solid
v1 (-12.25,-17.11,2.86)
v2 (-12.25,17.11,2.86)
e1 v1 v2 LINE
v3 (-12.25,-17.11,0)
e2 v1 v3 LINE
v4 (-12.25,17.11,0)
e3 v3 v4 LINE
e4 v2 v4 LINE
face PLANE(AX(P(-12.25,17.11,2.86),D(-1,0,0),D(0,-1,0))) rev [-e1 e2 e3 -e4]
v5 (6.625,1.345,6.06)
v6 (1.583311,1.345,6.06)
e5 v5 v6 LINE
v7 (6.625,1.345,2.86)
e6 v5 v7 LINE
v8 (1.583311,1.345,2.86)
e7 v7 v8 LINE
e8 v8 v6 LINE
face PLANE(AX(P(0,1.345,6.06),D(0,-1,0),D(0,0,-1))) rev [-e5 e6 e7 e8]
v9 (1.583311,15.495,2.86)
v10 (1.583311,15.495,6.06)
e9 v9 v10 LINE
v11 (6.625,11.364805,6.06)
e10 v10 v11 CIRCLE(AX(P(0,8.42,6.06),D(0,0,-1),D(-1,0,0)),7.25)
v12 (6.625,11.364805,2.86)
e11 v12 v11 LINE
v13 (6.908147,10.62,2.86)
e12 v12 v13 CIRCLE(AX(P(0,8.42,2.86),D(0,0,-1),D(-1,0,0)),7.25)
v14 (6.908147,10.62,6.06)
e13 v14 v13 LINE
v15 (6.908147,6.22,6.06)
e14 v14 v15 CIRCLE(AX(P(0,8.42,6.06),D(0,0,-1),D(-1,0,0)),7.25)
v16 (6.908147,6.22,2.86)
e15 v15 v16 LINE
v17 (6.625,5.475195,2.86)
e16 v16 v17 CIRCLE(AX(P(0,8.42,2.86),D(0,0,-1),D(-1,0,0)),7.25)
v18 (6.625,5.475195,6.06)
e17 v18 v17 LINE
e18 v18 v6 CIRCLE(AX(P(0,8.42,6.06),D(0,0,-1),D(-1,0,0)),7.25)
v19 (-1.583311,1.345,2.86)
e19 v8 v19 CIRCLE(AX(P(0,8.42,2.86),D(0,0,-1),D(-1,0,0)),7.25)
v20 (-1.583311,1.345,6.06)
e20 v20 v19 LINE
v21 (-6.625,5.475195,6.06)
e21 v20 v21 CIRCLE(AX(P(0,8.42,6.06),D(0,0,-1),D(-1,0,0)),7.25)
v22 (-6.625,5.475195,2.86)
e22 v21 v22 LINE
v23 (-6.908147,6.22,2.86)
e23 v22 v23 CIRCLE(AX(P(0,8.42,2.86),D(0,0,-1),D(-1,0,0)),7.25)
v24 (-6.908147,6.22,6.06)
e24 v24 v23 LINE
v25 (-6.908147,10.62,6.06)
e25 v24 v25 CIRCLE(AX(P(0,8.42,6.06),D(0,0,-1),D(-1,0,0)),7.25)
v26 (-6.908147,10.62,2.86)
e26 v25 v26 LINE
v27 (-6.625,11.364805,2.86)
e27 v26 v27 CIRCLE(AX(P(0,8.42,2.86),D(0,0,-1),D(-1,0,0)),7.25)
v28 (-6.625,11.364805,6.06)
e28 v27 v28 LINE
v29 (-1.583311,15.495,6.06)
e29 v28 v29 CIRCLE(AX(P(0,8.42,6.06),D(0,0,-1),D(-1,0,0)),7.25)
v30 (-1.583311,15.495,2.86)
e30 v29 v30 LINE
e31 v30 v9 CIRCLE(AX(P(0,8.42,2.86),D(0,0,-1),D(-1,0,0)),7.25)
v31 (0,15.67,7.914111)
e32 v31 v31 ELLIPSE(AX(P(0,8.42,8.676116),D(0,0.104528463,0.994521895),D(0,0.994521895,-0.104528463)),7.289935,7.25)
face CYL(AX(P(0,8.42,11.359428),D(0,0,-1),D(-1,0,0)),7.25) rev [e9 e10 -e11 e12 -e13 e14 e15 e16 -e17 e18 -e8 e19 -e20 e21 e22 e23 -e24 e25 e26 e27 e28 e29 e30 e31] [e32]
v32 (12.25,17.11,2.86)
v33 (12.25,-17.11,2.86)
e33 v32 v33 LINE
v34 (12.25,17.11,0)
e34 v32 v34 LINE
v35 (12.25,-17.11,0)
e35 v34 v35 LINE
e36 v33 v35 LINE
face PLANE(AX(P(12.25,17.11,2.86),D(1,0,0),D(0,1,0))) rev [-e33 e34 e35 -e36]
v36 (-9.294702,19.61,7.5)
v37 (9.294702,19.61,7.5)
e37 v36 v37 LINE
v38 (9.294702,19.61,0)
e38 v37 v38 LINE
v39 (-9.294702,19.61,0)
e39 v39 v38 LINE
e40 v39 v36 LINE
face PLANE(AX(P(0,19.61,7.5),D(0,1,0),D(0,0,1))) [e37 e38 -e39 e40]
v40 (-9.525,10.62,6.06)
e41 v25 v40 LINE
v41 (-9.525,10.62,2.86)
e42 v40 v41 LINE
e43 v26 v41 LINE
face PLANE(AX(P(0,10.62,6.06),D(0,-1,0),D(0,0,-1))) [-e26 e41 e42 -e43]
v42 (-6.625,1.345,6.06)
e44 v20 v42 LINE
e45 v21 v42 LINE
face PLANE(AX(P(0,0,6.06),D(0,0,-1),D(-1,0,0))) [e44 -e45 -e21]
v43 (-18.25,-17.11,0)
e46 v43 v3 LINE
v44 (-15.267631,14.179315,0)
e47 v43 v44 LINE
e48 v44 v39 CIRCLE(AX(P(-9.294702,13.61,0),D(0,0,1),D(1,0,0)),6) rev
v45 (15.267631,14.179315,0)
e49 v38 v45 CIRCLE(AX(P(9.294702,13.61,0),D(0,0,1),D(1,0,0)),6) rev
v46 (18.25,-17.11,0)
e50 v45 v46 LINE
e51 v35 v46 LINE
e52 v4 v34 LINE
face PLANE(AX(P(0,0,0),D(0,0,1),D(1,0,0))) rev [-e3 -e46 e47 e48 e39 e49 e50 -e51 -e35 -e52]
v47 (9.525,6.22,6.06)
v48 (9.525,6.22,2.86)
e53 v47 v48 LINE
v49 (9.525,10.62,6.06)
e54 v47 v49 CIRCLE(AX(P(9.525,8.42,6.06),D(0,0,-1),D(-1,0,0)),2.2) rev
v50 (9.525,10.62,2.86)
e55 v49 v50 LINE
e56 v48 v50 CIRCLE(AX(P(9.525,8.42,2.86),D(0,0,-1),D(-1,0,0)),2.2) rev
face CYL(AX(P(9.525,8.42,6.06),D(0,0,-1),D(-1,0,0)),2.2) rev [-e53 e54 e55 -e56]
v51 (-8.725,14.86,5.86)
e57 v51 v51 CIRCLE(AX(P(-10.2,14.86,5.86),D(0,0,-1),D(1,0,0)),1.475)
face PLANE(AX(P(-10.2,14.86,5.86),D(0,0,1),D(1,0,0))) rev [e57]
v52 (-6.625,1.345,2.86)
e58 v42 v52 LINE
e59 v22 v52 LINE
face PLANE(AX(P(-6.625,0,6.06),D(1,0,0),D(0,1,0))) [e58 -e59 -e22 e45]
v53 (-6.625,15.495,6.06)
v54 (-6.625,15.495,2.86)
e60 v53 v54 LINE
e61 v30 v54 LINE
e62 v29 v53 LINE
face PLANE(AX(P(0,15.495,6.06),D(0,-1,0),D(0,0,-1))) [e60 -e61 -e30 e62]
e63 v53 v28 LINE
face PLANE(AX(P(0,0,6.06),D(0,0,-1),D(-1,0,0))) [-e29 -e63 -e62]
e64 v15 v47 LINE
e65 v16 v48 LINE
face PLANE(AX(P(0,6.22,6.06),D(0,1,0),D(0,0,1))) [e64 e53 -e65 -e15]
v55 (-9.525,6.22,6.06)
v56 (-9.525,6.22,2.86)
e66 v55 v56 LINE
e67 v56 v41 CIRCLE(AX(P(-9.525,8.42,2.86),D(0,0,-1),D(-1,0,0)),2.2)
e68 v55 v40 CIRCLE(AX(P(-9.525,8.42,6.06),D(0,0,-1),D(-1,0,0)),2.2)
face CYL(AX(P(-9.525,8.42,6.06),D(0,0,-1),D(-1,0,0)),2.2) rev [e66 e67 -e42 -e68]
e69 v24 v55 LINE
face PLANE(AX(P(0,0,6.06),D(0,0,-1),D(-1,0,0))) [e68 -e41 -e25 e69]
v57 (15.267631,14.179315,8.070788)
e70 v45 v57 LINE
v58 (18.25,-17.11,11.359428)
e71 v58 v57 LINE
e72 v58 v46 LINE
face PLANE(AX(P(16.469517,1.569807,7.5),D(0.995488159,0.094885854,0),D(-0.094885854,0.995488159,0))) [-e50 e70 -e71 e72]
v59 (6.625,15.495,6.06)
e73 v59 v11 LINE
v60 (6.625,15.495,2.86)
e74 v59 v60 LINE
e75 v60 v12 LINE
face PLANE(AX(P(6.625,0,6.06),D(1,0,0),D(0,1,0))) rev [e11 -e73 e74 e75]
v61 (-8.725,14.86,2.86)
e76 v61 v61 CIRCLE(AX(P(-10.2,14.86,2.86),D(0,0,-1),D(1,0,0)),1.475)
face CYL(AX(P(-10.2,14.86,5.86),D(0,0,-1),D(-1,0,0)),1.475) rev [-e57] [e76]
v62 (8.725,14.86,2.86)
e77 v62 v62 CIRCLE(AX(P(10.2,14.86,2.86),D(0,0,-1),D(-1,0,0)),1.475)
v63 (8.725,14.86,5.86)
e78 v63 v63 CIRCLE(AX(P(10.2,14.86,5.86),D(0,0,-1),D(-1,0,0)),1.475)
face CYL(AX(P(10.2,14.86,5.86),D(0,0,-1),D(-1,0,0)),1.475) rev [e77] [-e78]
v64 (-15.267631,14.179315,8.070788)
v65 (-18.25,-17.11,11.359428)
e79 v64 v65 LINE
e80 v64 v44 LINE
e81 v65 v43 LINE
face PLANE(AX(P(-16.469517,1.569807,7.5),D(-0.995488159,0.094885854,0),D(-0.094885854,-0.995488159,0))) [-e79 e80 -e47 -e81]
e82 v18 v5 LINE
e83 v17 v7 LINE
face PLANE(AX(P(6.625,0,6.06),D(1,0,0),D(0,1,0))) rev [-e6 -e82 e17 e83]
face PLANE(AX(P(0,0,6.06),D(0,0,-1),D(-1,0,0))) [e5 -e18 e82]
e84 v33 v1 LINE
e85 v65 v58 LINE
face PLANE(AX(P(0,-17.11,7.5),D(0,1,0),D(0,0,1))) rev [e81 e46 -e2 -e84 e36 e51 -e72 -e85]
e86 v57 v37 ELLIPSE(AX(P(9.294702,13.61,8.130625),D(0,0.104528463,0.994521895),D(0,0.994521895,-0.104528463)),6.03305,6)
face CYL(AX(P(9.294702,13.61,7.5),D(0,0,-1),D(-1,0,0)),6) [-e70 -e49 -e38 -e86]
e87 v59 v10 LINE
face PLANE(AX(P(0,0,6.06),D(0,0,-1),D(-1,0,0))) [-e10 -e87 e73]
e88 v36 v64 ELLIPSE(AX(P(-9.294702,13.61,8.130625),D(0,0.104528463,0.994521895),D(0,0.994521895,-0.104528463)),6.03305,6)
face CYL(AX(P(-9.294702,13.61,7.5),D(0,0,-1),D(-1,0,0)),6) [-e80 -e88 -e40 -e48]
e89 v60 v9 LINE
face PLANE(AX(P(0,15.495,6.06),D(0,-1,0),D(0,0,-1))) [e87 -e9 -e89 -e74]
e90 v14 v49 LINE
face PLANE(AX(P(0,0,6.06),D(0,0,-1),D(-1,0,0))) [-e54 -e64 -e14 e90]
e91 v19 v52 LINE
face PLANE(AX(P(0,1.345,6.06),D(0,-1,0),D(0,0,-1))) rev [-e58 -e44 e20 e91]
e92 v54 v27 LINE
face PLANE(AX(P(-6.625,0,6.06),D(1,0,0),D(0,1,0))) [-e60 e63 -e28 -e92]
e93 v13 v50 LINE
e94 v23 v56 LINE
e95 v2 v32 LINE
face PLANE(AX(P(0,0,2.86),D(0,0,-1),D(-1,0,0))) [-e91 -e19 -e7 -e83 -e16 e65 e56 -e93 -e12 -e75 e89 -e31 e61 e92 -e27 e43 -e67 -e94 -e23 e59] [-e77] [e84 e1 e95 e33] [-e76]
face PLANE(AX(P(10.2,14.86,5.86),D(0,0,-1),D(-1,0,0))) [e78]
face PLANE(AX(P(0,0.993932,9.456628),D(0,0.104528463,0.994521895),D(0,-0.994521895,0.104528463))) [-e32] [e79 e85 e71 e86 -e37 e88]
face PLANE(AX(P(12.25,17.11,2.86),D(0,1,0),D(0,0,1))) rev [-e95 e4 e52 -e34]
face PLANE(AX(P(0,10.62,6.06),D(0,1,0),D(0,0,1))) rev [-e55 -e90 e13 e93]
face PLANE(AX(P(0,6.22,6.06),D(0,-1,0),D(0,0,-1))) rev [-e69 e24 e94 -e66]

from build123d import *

# Parameters (mm, degrees)
SKETCH1_W               = 24.5
SKETCH1_H               = 34.22
BOSS_EXTRUDE1_DEPTH     = 7.5
SKETCH2_W               = 24.5
SKETCH2_H               = 34.22
CUT_EXTRUDE1_DEPTH      = 2.86
SKETCH3_W               = 13.25
SKETCH3_H               = 14.15
CUT_EXTRUDE2_DEPTH      = 3.2
BOSS_EXTRUDE2_START     = -18.25
BOSS_EXTRUDE2_DEPTH     = 36.5
BOSS_EXTRUDE2_START_2   = 7.5
BOSS_EXTRUDE2_2_DEPTH   = 4.5
CUT_EXTRUDE3_DEPTH      = 28.465218004
CUT_EXTRUDE3_DEPTH_BACK = 28.465218004
SKETCH4_R               = 7.25
FILLET1_R               = 6
SKETCH6_R               = 1.475
CUT_EXTRUDE4_DEPTH      = 3


with BuildPart() as part:
    # Sketch1 → Boss-Extrude1 (new body)
    with BuildSketch(Plane.XY):
        Polygon((-12.25, -17.11), (-12.25, 17.11), (12.25, 17.11), (12.25, -17.11), (18.25, -17.11), (14.75, 19.61), (-14.75, 19.61), (-18.25, -17.11), align=None)
        Rectangle(SKETCH1_W, SKETCH1_H)
    extrude(amount=BOSS_EXTRUDE1_DEPTH)

    # Sketch2 → Cut-Extrude1 (cut)
    with BuildSketch(Plane(origin=(0, 0, 0), x_dir=(-1, 0, 0), z_dir=(0, 0, -1))):
        Rectangle(SKETCH2_W, SKETCH2_H)
    extrude(amount=-CUT_EXTRUDE1_DEPTH, mode=Mode.SUBTRACT)

    # Sketch3 → Cut-Extrude2 (cut)
    with BuildSketch(Plane(origin=(0, 0, 2.86), x_dir=(-1, 0, 0), z_dir=(0, 0, -1))):
        with BuildLine():
            Line((-6.625, 6.22), (-6.625, 10.62))
            Line((-6.625, 10.62), (-9.525, 10.62))
            ThreePointArc((-9.525, 10.62), (-11.725, 8.42), (-9.525, 6.22))
            Line((-9.525, 6.22), (-6.625, 6.22))
        make_face()
        with Locations((0, 8.42)):
            Rectangle(SKETCH3_W, SKETCH3_H)
        with BuildLine():
            Line((9.525, 10.62), (6.625, 10.62))
            Line((6.625, 10.62), (6.625, 6.22))
            Line((6.625, 6.22), (9.525, 6.22))
            ThreePointArc((9.525, 6.22), (11.725, 8.42), (9.525, 10.62))
        make_face()
    extrude(amount=-CUT_EXTRUDE2_DEPTH, mode=Mode.SUBTRACT)

    # Boss-Extrude2: read off the stored shape, not the designer's step
    # Boss-Extrude2 outline → Boss-Extrude2 (add)
    with BuildSketch(Plane.YZ.offset(BOSS_EXTRUDE2_START)):
        Polygon((-17.11, 11.359427519), (-17.11, 7.5), (19.61, 7.5), align=None)
    extrude(amount=BOSS_EXTRUDE2_DEPTH)

    # Boss-Extrude2 2 outline → Boss-Extrude2 2 (cut)
    with BuildSketch(Plane.XY.offset(BOSS_EXTRUDE2_START_2)):
        Polygon((14.75, 19.61), (18.25, -17.11), (18.25, 21), (14.617510893, 21), align=None)
        Polygon((-14.75, 19.61), (-14.617510893, 21), (-18.25, 21), (-18.25, -17.11), align=None)
    extrude(amount=BOSS_EXTRUDE2_2_DEPTH, mode=Mode.SUBTRACT)

    # Sketch4 → Cut-Extrude3 (cut, two sides: drawn at the far end of the back side and taken through both)
    with BuildSketch(Plane(origin=(0, 0, 6.06), x_dir=(-1, 0, 0), z_dir=(0, 0, -1)).offset(-CUT_EXTRUDE3_DEPTH_BACK)):
        with Locations(Location((0, 8.42, 0), (0, 0, 17.6648328))):
            Circle(SKETCH4_R)
    extrude(amount=CUT_EXTRUDE3_DEPTH + CUT_EXTRUDE3_DEPTH_BACK, mode=Mode.SUBTRACT)

    # Fillet1
    fillet1_edges = [part.edges().sort_by_distance(p)[0] for p in [
        (-14.75, 19.61, 3.75),
        (14.75, 19.61, 3.75),
    ]]
    fillet(fillet1_edges, radius=FILLET1_R)

    # Sketch6 → Cut-Extrude4 (cut)
    with BuildSketch(Plane(origin=(0, 0, 2.86), x_dir=(-1, 0, 0), z_dir=(0, 0, -1))):
        with Locations((-10.2, 14.86)):
            Circle(SKETCH6_R)
        with Locations(Location((10.2, 14.86, 0), (0, 0, 180))):
            Circle(SKETCH6_R)
    extrude(amount=-CUT_EXTRUDE4_DEPTH, mode=Mode.SUBTRACT)


solid = part.part
